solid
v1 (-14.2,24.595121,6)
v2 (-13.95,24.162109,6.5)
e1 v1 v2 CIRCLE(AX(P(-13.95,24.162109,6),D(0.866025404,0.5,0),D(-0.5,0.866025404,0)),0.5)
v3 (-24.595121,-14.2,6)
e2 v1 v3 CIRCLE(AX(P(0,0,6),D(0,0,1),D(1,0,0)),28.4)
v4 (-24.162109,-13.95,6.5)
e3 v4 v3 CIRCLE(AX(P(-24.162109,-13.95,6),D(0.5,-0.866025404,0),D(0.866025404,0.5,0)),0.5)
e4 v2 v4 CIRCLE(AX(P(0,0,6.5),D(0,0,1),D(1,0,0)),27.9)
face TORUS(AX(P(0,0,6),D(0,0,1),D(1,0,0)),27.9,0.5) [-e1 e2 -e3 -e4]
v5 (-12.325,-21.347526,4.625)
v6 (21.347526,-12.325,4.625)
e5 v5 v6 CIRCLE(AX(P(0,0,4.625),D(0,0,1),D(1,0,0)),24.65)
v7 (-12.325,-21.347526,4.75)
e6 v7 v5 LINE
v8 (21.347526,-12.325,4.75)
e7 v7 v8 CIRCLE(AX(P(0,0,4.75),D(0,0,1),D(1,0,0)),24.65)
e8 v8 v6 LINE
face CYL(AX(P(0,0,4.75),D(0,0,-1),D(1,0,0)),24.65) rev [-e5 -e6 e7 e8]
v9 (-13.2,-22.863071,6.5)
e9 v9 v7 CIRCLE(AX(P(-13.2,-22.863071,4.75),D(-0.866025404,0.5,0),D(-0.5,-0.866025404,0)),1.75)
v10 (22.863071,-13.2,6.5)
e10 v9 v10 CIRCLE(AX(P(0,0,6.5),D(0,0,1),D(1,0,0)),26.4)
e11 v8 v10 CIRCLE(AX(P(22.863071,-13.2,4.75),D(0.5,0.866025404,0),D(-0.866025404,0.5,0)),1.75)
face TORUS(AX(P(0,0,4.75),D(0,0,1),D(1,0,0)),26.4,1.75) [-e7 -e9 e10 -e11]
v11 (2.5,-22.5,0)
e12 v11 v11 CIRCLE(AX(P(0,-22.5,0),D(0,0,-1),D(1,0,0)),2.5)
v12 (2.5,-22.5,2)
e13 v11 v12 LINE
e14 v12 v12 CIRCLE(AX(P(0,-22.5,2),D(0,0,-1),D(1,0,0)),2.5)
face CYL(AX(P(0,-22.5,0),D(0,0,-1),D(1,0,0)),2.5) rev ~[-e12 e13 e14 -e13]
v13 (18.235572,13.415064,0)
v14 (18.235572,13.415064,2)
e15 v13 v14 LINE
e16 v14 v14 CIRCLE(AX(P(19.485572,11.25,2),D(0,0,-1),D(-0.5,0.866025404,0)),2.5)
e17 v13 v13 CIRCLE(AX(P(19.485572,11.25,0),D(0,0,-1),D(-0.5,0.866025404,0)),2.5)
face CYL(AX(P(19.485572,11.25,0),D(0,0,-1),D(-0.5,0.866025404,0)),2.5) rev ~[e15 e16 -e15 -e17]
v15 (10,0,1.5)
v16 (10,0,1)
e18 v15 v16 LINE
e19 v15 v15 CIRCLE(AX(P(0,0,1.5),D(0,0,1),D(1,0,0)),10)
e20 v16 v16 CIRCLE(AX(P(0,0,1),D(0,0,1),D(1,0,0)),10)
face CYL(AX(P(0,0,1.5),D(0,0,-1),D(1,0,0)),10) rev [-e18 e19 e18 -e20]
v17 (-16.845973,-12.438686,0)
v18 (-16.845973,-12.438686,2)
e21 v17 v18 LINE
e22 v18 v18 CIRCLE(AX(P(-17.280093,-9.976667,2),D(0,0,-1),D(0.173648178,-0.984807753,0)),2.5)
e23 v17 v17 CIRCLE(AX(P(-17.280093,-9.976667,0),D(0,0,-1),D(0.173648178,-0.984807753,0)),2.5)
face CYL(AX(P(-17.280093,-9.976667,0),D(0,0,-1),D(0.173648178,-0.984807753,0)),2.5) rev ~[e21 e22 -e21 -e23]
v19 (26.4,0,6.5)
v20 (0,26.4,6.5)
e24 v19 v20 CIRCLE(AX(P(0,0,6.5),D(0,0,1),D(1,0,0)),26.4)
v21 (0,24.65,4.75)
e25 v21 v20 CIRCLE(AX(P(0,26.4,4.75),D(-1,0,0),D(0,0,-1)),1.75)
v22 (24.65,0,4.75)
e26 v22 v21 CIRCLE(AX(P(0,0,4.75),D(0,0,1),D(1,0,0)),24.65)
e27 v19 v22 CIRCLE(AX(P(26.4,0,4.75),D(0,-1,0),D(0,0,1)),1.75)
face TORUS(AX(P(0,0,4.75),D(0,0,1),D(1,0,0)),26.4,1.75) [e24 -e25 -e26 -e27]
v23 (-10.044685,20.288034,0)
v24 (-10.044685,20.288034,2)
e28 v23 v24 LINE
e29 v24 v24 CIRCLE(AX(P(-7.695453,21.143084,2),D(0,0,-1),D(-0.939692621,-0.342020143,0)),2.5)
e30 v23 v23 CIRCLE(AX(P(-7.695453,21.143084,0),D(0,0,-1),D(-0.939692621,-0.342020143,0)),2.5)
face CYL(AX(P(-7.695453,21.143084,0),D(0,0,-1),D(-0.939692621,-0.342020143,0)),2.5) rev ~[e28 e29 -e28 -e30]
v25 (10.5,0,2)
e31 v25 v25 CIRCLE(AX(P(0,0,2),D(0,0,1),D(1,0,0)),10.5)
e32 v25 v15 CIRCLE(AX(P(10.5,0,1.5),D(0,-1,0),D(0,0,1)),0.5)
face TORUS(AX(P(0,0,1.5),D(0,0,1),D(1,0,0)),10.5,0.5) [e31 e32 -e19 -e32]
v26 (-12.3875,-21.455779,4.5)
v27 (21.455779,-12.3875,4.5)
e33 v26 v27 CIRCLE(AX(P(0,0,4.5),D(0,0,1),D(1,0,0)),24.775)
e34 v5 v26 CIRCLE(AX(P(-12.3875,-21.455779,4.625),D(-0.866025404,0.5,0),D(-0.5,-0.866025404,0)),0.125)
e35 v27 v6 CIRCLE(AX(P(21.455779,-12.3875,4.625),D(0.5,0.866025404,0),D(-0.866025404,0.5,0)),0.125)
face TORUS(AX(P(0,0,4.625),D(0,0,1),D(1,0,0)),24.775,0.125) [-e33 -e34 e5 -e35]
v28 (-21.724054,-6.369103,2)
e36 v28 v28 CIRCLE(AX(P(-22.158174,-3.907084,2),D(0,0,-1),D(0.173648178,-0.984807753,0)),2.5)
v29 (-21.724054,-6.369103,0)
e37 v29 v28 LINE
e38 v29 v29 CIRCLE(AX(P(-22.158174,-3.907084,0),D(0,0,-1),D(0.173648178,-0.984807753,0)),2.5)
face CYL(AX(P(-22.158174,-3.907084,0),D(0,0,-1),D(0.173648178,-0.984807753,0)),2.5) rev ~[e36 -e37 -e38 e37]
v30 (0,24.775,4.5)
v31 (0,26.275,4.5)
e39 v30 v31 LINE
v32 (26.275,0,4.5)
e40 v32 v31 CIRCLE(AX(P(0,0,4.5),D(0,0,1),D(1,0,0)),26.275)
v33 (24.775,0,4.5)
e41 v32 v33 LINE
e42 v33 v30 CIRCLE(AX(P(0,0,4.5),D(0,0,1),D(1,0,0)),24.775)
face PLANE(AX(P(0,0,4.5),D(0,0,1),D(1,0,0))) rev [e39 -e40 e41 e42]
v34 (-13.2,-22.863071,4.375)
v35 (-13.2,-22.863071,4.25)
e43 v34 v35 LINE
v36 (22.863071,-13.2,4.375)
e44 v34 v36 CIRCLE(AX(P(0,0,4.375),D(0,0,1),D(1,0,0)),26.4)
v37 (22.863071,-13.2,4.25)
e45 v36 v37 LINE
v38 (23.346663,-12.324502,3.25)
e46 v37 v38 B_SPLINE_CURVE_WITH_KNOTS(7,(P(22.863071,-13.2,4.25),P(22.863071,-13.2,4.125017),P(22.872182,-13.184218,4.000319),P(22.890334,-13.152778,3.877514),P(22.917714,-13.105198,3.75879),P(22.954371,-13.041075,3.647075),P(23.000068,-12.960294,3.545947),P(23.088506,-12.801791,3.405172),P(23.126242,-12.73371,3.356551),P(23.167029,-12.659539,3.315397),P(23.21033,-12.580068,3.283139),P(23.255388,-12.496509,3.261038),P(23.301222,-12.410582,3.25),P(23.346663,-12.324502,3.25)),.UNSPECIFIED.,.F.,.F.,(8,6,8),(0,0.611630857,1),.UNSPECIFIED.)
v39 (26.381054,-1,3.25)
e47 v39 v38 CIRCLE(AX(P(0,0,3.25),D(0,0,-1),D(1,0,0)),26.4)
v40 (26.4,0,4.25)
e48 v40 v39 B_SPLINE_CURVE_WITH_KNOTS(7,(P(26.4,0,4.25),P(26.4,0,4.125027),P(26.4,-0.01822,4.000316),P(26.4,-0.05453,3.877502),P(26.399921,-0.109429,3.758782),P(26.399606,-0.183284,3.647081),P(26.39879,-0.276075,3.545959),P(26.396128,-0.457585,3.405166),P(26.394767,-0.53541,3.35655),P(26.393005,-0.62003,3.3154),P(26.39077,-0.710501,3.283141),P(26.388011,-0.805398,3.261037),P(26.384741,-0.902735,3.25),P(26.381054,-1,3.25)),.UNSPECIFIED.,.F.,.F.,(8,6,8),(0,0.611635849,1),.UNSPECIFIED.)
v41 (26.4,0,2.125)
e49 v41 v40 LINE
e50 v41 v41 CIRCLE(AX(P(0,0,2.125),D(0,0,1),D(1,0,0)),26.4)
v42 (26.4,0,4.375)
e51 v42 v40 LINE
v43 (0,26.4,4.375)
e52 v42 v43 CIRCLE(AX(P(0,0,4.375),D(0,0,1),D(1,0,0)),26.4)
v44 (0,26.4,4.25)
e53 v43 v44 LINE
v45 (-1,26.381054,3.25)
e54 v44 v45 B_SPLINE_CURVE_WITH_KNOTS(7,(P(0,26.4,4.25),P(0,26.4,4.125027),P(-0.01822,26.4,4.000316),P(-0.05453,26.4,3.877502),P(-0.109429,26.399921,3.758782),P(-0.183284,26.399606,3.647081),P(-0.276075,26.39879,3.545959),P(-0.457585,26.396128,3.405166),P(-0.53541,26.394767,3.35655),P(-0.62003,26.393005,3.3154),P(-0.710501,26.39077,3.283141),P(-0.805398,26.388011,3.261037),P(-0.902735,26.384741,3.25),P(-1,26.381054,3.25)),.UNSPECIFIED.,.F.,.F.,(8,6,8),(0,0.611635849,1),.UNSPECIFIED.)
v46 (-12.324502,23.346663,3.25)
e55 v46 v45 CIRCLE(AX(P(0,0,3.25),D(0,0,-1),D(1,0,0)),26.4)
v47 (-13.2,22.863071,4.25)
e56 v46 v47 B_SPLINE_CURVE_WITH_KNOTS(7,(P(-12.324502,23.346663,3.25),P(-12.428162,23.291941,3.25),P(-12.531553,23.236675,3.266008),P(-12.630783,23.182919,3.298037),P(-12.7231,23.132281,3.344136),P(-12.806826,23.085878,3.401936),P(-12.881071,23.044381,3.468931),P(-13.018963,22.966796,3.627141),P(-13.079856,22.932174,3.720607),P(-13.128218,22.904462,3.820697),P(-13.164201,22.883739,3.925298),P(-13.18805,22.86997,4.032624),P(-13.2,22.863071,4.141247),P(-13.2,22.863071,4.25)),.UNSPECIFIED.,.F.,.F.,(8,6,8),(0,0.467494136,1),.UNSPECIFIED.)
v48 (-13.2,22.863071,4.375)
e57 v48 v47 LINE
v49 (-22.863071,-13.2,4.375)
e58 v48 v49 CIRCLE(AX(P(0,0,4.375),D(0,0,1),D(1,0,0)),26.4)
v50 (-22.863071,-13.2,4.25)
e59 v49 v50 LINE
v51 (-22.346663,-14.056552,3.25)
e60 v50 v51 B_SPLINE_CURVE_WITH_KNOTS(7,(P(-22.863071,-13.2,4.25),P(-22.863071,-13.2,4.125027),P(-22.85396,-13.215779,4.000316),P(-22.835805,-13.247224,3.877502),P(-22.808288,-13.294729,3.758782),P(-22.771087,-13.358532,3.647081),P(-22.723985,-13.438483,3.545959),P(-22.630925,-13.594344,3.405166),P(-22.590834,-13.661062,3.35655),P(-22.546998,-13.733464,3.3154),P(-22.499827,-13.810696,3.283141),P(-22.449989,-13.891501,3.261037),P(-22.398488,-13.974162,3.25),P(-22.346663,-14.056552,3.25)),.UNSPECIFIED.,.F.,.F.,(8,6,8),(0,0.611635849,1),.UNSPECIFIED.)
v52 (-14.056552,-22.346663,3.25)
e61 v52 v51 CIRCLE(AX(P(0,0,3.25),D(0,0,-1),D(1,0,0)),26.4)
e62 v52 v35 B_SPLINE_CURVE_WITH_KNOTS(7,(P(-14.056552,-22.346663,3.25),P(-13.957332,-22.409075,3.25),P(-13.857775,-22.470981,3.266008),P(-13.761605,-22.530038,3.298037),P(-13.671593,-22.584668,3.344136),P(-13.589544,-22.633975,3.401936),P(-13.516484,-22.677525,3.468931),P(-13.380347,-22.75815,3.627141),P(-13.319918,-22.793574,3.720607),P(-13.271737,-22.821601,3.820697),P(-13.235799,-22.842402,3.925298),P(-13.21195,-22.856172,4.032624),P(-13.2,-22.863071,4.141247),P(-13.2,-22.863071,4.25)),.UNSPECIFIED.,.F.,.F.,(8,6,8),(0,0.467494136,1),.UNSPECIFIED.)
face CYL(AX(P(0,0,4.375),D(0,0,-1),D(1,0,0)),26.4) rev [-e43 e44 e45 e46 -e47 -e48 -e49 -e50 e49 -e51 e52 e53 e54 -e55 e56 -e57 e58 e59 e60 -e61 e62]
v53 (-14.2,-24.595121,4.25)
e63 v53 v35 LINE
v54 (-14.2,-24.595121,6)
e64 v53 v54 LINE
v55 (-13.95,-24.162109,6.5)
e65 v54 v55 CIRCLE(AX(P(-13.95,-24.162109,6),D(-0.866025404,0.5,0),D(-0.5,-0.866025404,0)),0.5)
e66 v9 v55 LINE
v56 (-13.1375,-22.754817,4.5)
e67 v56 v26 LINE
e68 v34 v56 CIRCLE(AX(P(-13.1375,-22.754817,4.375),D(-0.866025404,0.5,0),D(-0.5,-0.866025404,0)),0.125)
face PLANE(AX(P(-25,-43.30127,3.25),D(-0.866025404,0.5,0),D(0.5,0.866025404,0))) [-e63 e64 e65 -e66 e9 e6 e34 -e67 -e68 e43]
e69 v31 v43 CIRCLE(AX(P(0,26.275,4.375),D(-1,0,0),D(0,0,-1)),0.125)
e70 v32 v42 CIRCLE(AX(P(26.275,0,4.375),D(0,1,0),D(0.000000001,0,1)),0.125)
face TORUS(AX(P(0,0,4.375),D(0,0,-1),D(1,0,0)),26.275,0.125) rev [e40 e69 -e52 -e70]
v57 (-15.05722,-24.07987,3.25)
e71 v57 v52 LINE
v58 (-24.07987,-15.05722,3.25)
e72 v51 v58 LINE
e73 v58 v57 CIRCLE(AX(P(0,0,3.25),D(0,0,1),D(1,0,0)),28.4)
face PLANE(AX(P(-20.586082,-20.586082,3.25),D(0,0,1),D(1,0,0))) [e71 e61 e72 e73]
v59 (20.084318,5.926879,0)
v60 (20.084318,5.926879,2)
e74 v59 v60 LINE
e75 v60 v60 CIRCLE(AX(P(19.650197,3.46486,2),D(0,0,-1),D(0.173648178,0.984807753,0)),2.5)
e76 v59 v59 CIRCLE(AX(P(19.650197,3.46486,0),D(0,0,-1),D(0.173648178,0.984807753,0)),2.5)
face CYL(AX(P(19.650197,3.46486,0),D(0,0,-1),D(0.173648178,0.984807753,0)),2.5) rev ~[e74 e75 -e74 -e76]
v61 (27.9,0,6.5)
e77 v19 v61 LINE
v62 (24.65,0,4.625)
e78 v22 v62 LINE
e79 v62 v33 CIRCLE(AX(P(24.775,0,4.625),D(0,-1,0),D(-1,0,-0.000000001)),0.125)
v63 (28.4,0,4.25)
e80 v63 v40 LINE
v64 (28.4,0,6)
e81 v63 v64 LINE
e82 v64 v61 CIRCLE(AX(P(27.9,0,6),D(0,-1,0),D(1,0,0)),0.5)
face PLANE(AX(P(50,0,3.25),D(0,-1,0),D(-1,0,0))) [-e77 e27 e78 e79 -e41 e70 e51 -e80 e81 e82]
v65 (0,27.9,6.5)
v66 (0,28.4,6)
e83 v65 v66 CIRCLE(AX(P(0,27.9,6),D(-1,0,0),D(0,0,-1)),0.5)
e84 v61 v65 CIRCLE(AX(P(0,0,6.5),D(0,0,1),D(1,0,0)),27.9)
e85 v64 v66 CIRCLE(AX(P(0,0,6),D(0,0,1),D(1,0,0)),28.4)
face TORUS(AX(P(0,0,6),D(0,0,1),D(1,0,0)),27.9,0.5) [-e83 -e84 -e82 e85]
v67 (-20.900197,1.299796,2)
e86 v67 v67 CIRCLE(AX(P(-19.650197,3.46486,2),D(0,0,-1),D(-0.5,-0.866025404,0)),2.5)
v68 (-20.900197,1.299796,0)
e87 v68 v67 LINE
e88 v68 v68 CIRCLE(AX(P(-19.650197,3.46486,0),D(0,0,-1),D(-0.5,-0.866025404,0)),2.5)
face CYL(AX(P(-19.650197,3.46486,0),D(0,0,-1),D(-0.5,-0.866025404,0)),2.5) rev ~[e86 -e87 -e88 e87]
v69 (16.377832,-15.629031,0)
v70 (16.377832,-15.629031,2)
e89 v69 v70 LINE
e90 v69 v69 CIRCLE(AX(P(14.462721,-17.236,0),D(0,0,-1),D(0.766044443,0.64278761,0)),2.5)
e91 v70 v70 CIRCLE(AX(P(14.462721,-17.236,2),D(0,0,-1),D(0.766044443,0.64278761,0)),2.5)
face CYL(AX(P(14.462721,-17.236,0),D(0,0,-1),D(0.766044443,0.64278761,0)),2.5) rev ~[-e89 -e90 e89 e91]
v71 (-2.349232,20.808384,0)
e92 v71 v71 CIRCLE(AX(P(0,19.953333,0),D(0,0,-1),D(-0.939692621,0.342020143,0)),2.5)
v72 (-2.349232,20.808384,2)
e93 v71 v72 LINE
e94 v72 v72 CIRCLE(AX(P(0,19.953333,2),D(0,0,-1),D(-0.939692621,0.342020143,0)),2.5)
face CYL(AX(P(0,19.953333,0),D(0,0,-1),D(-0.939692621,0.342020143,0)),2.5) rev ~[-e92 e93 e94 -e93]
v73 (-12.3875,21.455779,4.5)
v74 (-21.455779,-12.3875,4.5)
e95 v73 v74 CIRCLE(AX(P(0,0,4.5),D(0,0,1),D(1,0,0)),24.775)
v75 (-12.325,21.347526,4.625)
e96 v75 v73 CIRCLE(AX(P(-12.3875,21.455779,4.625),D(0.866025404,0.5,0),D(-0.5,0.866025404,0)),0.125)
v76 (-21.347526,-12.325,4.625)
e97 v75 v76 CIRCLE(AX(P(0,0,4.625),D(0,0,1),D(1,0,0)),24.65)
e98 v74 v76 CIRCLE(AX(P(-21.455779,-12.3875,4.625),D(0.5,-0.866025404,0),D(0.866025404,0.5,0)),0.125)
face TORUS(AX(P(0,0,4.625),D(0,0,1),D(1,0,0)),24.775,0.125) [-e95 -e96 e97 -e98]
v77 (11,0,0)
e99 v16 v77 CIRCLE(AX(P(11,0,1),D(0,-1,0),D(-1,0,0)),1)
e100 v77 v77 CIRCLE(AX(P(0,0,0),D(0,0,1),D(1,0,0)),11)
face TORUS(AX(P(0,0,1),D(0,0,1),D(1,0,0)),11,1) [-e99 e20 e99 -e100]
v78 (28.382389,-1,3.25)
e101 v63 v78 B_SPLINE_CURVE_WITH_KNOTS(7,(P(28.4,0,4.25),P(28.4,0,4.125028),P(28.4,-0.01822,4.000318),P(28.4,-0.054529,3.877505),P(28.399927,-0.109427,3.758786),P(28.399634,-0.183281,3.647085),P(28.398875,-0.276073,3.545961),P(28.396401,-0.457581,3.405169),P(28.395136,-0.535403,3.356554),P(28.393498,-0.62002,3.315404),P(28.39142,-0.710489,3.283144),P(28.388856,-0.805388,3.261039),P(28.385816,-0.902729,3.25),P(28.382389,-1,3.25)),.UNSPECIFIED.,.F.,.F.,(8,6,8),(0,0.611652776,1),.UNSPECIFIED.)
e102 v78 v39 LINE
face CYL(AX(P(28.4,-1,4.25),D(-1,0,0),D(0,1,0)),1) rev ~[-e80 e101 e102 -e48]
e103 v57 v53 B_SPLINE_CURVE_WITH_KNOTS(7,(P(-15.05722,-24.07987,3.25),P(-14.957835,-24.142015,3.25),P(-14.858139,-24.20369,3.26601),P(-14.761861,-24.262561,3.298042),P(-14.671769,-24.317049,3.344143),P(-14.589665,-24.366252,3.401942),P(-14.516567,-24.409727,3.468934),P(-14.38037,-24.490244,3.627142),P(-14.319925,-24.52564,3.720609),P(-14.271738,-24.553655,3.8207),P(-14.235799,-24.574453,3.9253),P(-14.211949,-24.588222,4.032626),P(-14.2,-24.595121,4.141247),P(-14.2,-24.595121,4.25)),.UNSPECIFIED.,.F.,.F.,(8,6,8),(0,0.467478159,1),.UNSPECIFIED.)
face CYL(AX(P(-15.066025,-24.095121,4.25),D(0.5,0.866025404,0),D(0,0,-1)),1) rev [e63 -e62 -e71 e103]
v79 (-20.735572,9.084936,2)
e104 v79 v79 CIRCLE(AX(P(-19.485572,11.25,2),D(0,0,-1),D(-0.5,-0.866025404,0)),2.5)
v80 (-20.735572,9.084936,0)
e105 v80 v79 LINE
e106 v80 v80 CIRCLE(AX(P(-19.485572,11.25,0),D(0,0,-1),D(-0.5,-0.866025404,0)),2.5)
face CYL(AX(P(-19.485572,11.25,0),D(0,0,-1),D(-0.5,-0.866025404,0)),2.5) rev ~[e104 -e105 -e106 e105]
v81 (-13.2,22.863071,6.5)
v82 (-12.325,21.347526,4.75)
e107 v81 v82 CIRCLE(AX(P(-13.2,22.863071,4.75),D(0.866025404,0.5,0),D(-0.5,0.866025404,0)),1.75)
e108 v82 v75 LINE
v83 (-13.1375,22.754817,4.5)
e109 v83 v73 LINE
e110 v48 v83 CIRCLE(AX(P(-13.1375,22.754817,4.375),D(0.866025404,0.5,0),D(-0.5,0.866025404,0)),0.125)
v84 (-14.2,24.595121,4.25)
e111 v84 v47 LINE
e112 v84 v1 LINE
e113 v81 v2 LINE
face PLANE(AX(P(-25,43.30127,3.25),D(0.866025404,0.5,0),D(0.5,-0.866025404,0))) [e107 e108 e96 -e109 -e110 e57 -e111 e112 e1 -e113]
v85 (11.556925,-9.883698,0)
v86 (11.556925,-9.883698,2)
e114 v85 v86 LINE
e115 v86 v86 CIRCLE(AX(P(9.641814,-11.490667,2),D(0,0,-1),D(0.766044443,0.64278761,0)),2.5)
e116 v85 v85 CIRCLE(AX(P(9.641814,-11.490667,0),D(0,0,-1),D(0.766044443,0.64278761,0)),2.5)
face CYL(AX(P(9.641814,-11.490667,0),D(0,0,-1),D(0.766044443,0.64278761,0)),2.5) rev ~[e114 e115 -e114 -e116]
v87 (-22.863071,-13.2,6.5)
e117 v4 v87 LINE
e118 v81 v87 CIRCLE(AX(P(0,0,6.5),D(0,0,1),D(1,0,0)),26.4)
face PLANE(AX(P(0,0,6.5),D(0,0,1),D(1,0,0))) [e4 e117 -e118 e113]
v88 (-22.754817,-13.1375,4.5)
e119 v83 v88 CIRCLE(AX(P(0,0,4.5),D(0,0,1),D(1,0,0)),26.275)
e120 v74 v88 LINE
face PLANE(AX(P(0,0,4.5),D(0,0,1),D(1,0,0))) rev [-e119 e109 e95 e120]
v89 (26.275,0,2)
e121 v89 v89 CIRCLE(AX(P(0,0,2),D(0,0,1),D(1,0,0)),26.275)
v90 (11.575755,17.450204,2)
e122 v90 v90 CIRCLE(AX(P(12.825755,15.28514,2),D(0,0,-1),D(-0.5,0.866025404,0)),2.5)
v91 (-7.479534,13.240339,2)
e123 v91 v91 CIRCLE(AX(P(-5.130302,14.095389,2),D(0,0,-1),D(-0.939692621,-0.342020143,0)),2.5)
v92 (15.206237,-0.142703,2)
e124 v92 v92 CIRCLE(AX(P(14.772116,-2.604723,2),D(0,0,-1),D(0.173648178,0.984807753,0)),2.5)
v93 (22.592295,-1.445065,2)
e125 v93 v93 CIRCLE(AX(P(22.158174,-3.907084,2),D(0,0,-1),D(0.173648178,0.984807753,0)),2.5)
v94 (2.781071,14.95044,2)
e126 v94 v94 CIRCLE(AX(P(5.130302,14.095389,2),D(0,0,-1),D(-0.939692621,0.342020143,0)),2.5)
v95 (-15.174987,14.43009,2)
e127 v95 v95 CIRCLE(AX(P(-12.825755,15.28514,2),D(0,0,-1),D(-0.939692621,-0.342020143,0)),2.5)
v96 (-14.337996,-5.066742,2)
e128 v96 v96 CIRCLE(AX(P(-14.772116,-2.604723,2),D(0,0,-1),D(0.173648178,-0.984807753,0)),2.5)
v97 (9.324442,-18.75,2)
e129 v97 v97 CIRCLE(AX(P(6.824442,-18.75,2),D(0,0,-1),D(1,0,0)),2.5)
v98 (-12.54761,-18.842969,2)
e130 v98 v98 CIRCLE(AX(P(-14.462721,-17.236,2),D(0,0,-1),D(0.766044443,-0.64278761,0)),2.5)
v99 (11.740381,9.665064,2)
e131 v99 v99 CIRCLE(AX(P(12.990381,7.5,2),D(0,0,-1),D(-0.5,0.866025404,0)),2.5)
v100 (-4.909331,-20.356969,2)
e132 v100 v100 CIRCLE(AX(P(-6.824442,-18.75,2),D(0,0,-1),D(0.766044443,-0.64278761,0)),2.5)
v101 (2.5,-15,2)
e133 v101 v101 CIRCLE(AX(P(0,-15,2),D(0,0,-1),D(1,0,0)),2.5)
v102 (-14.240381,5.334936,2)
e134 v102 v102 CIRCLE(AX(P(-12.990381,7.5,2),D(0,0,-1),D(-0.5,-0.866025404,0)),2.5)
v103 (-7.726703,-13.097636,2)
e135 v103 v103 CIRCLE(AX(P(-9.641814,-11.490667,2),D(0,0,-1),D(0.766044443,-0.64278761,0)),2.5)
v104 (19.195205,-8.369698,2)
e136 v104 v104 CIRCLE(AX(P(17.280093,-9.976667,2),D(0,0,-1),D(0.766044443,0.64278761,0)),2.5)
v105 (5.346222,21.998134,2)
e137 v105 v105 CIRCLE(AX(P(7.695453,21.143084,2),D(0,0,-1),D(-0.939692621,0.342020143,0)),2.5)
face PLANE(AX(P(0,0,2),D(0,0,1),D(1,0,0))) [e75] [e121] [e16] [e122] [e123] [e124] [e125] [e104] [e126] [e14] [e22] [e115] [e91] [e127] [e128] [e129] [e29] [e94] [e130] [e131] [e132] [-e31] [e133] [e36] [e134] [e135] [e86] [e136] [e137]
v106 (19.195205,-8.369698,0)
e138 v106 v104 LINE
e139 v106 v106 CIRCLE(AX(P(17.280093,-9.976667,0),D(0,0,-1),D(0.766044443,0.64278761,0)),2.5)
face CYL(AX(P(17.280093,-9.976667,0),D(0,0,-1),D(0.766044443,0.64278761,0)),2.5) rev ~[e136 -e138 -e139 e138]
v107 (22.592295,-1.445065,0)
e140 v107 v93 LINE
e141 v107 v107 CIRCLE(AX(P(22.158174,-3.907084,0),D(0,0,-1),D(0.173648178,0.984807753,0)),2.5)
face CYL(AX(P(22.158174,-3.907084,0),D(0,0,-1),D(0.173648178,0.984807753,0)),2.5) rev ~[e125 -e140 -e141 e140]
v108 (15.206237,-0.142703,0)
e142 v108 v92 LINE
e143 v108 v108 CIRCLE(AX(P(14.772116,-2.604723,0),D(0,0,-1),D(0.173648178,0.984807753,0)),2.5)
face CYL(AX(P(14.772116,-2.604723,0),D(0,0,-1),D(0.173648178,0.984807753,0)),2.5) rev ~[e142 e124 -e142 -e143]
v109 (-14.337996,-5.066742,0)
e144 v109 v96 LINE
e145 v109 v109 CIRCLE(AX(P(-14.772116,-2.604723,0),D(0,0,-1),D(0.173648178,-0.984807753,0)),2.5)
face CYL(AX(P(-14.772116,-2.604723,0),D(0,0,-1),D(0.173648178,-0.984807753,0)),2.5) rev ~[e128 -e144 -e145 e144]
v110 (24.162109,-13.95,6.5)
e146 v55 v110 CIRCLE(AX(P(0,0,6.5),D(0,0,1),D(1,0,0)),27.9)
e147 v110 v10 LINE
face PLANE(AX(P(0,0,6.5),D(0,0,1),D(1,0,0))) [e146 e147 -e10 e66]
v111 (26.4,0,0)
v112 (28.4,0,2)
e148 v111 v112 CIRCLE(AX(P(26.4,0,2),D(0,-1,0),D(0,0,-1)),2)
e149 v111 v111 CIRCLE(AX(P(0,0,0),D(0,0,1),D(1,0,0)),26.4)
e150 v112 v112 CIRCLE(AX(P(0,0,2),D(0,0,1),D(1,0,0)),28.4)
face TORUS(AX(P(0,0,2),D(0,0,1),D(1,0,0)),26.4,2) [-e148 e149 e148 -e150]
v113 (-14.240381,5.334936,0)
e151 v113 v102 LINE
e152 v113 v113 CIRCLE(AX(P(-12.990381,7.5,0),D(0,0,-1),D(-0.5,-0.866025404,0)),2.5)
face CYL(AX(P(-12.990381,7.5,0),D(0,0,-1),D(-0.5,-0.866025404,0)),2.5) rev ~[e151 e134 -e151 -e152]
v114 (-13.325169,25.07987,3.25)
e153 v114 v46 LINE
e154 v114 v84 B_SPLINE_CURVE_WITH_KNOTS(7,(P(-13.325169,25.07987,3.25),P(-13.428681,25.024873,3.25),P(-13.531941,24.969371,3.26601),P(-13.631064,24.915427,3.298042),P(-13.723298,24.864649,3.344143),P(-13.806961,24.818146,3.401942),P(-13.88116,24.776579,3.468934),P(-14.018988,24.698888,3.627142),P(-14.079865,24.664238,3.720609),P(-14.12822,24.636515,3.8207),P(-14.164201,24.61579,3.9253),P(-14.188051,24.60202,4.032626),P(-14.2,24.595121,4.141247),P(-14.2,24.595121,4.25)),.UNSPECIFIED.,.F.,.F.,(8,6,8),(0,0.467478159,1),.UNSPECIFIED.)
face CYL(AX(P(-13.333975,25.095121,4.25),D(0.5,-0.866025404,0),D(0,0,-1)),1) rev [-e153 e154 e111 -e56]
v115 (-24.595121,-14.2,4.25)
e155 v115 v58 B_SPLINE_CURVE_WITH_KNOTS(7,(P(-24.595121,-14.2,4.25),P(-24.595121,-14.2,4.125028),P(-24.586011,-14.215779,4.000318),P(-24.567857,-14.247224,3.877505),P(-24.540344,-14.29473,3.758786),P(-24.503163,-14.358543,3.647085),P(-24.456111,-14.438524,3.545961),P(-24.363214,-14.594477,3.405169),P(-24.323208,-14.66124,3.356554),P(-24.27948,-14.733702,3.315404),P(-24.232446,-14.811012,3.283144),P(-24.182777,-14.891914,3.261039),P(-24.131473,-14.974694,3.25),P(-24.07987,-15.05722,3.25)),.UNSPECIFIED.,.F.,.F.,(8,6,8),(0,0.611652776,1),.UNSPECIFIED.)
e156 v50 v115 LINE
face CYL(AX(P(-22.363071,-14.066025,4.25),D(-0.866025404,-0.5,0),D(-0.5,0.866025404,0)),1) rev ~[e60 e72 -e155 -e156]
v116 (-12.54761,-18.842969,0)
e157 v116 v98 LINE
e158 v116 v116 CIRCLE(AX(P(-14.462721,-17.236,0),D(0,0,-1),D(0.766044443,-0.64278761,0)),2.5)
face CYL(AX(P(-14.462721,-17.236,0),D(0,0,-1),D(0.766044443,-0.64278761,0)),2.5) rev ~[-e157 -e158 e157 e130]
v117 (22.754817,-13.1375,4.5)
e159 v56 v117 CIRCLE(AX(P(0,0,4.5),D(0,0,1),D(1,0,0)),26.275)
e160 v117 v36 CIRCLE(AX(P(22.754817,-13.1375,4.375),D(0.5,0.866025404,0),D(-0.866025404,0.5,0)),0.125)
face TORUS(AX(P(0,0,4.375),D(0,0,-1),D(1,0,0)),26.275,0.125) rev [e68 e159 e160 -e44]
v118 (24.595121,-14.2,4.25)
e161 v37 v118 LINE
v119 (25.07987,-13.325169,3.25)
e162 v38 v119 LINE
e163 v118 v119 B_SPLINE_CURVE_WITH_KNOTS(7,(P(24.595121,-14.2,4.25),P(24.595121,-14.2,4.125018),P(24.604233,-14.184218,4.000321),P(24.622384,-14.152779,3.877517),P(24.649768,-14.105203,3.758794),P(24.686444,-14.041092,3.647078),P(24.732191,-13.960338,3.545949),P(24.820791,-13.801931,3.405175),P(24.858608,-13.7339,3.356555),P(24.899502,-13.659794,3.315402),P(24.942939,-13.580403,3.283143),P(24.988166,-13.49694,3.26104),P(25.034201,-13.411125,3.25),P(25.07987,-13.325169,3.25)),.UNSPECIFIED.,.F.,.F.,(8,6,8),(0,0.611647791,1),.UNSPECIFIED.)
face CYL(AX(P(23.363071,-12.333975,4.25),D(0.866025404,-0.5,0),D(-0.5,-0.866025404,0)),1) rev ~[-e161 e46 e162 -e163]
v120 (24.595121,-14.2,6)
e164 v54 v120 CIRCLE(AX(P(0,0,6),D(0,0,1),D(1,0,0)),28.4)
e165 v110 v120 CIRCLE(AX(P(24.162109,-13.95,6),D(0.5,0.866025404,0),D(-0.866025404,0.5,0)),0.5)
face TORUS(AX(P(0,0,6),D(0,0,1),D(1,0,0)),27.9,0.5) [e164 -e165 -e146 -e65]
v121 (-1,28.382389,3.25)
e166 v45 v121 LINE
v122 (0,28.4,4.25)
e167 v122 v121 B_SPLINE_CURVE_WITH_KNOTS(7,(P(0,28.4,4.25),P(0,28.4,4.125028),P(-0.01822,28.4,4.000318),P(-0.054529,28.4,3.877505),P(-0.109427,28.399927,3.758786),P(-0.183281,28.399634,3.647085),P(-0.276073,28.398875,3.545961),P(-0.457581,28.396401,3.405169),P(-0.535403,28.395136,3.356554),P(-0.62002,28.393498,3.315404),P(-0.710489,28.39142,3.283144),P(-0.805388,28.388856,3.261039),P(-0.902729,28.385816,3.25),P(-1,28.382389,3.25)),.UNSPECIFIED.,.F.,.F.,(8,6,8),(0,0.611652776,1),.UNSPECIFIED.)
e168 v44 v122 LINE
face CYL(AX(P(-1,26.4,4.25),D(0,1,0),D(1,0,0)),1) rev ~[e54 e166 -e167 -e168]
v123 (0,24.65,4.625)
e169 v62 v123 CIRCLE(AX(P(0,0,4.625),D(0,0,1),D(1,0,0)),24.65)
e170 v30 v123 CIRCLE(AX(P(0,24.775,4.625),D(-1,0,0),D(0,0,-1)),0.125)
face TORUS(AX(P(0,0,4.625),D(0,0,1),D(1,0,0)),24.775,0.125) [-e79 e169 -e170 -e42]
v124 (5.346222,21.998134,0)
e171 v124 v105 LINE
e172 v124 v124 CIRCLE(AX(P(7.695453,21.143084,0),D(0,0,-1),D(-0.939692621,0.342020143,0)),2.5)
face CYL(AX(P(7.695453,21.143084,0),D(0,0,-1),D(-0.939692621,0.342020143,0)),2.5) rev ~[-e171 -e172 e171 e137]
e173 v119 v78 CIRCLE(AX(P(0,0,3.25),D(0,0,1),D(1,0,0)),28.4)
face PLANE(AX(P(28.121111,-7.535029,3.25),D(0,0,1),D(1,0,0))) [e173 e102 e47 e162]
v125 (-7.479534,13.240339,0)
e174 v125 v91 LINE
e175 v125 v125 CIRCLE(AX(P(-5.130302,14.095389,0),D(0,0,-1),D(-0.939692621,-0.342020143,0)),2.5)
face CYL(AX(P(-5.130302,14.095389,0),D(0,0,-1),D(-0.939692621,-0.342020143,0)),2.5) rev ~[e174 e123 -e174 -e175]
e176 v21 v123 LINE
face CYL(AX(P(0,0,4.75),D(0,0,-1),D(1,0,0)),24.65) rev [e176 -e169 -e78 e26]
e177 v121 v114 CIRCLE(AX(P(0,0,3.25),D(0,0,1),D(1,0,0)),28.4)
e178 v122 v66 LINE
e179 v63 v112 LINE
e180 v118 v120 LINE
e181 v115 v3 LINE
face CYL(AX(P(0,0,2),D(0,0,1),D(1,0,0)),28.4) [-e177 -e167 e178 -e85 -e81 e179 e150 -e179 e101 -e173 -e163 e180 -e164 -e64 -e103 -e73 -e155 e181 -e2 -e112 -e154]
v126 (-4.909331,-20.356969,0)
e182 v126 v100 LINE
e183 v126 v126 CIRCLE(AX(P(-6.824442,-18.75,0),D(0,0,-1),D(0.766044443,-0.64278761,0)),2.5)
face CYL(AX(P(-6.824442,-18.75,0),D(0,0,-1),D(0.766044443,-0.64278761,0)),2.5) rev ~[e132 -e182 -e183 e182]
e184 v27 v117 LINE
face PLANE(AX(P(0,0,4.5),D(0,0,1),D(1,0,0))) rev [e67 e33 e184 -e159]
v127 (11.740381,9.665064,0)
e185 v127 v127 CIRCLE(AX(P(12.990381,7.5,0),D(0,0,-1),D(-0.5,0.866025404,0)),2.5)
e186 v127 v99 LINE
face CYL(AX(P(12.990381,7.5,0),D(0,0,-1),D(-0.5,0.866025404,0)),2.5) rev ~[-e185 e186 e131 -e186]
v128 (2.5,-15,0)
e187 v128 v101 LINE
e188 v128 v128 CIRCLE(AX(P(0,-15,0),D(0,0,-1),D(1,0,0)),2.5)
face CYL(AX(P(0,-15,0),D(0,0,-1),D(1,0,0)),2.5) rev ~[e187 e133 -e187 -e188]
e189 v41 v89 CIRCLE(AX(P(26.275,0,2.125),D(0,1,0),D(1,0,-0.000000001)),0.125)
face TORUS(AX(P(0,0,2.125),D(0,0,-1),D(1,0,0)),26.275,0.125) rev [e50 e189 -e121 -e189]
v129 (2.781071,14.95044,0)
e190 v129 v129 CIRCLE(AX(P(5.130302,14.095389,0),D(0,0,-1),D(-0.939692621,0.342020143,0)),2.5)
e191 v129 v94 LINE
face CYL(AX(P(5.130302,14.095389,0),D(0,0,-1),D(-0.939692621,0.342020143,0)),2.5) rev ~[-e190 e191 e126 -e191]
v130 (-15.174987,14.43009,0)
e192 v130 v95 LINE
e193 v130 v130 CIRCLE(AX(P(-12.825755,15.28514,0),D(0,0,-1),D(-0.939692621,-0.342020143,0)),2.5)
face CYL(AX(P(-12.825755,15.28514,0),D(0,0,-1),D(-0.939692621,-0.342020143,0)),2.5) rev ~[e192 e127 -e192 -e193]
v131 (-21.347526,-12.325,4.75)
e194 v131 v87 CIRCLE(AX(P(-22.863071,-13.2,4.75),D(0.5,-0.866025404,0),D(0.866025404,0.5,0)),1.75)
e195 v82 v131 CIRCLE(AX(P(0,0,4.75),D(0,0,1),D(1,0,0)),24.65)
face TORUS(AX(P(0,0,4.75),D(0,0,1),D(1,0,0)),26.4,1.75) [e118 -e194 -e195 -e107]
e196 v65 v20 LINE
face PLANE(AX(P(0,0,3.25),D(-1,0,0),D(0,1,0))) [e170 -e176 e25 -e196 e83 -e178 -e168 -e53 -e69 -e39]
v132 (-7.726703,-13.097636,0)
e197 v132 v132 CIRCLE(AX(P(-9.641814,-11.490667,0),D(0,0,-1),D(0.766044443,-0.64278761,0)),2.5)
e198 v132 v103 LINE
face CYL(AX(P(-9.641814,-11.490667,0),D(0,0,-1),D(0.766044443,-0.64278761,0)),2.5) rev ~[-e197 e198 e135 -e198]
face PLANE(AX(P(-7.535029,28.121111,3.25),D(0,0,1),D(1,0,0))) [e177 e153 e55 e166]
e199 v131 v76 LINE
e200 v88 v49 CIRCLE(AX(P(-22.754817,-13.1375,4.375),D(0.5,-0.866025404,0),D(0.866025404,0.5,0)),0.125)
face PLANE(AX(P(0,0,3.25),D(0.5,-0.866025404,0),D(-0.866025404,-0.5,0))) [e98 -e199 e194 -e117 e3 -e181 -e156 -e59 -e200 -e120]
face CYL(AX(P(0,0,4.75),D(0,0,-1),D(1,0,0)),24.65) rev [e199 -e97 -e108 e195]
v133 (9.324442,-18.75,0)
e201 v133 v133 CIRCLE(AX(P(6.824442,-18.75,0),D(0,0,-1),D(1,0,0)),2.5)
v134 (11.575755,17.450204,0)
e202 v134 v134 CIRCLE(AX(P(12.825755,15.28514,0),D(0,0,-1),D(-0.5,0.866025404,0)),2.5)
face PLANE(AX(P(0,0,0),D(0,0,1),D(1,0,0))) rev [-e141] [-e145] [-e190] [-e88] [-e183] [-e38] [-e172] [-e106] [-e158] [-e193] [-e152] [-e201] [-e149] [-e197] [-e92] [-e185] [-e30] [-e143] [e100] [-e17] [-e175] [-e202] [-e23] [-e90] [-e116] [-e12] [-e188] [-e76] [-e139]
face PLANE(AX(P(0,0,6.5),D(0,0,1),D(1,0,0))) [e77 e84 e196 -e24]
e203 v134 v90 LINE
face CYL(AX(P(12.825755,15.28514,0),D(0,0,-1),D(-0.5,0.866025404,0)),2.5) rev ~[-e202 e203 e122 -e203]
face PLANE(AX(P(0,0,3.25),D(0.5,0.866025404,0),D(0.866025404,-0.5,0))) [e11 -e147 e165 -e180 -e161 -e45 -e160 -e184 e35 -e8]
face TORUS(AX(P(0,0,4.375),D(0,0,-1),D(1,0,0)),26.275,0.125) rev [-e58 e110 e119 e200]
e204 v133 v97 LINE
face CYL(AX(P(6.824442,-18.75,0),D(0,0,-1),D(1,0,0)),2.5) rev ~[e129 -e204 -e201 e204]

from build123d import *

# Parameters (mm, degrees)
F3_R            = 2.5
F4_DEPTH        = 2
F4_COPIES_COUNT = 9
F7_DEPTH        = 25
F8_R            = 1


# Not quite as in the source:
# - a pattern or mirror of a feature is missing from the dataset's text; its kind, count and spacing are read off the source's solid


with BuildPart() as f2:
    # F0 (on Front) → F2 (revolve)
    with BuildSketch(Plane.XZ):
        with BuildLine():
            ThreePointArc((10, 1), (10.2928932188, 0.2928932188), (11, 0))
            Line((11, 0), (26.4, 0))
            ThreePointArc((26.4, 0), (27.8142135624, 0.5857864376), (28.4, 2))
            Line((28.4, 2), (28.4, 6))
            ThreePointArc((28.4, 6), (28.2535533906, 6.3535533906), (27.9, 6.5))
            Line((27.9, 6.5), (26.4, 6.5))
            ThreePointArc((26.4, 6.5), (25.1625631329, 5.9874368671), (24.65, 4.75))
            Line((24.65, 4.75), (24.65, 4.625))
            ThreePointArc((24.65, 4.625), (24.6866116524, 4.5366116524), (24.775, 4.5))
            Line((24.775, 4.5), (26.275, 4.5))
            ThreePointArc((26.275, 4.5), (26.3633883476, 4.4633883476), (26.4, 4.375))
            Line((26.4, 4.375), (26.4, 2.125))
            ThreePointArc((26.4, 2.125), (26.3633883476, 2.0366116524), (26.275, 2))
            Line((26.275, 2), (10.5, 2))
            ThreePointArc((10.5, 2), (10.1464466094, 1.8535533906), (10, 1.5))
            Line((10, 1.5), (10, 1))
        make_face()
    revolve(axis=Axis((0, 0, 17.7606791258), (0, 0, 1)))

    # F3 (on face) → F4 (cut, through all)
    with BuildSketch(Plane(origin=(0, 0, 0), x_dir=(1, 0, 0), z_dir=(0, 0, -1))):
        with Locations((0, 22.5)):
            Circle(F3_R)
        with Locations((6.8244418925, 18.75)):
            Circle(F3_R)
        with Locations((0, 15)):
            Circle(F3_R)
    f4 = extrude(amount=-F4_DEPTH, mode=Mode.SUBTRACT)

    # F4_copies: F4 ×9 about axis
    f4_copies_axis = Axis((0, 0, 0), (0, 0, 1))
    for i in range(1, F4_COPIES_COUNT):
        add(f4.rotate(f4_copies_axis, i * 360 / F4_COPIES_COUNT), mode=Mode.SUBTRACT)

    # F6 (on offset) → F7 (cut)
    with BuildSketch(Plane.XY.offset(3.25)):
        Polygon((-25, 43.3012701892), (0, 0), (0, 50), align=None)
        Polygon((50, 0), (0, 0), (43.3012701892, -25), align=None)
        Polygon((-25, -43.3012701892), (0, 0), (-43.3012701892, -25), align=None)
    extrude(amount=F7_DEPTH, mode=Mode.SUBTRACT)

    # F8
    f8_edges = [f2.edges().sort_by_distance(p)[0] for p in [
        (0, 27.4, 3.25),
        (-13.7, 23.729096, 3.25),
        (27.4, 0, 3.25),
        (23.729096, -13.7, 3.25),
        (-13.7, -23.729096, 3.25),
        (-23.729096, -13.7, 3.25),
    ]]
    fillet(f8_edges, radius=F8_R)


solid = f2.part
